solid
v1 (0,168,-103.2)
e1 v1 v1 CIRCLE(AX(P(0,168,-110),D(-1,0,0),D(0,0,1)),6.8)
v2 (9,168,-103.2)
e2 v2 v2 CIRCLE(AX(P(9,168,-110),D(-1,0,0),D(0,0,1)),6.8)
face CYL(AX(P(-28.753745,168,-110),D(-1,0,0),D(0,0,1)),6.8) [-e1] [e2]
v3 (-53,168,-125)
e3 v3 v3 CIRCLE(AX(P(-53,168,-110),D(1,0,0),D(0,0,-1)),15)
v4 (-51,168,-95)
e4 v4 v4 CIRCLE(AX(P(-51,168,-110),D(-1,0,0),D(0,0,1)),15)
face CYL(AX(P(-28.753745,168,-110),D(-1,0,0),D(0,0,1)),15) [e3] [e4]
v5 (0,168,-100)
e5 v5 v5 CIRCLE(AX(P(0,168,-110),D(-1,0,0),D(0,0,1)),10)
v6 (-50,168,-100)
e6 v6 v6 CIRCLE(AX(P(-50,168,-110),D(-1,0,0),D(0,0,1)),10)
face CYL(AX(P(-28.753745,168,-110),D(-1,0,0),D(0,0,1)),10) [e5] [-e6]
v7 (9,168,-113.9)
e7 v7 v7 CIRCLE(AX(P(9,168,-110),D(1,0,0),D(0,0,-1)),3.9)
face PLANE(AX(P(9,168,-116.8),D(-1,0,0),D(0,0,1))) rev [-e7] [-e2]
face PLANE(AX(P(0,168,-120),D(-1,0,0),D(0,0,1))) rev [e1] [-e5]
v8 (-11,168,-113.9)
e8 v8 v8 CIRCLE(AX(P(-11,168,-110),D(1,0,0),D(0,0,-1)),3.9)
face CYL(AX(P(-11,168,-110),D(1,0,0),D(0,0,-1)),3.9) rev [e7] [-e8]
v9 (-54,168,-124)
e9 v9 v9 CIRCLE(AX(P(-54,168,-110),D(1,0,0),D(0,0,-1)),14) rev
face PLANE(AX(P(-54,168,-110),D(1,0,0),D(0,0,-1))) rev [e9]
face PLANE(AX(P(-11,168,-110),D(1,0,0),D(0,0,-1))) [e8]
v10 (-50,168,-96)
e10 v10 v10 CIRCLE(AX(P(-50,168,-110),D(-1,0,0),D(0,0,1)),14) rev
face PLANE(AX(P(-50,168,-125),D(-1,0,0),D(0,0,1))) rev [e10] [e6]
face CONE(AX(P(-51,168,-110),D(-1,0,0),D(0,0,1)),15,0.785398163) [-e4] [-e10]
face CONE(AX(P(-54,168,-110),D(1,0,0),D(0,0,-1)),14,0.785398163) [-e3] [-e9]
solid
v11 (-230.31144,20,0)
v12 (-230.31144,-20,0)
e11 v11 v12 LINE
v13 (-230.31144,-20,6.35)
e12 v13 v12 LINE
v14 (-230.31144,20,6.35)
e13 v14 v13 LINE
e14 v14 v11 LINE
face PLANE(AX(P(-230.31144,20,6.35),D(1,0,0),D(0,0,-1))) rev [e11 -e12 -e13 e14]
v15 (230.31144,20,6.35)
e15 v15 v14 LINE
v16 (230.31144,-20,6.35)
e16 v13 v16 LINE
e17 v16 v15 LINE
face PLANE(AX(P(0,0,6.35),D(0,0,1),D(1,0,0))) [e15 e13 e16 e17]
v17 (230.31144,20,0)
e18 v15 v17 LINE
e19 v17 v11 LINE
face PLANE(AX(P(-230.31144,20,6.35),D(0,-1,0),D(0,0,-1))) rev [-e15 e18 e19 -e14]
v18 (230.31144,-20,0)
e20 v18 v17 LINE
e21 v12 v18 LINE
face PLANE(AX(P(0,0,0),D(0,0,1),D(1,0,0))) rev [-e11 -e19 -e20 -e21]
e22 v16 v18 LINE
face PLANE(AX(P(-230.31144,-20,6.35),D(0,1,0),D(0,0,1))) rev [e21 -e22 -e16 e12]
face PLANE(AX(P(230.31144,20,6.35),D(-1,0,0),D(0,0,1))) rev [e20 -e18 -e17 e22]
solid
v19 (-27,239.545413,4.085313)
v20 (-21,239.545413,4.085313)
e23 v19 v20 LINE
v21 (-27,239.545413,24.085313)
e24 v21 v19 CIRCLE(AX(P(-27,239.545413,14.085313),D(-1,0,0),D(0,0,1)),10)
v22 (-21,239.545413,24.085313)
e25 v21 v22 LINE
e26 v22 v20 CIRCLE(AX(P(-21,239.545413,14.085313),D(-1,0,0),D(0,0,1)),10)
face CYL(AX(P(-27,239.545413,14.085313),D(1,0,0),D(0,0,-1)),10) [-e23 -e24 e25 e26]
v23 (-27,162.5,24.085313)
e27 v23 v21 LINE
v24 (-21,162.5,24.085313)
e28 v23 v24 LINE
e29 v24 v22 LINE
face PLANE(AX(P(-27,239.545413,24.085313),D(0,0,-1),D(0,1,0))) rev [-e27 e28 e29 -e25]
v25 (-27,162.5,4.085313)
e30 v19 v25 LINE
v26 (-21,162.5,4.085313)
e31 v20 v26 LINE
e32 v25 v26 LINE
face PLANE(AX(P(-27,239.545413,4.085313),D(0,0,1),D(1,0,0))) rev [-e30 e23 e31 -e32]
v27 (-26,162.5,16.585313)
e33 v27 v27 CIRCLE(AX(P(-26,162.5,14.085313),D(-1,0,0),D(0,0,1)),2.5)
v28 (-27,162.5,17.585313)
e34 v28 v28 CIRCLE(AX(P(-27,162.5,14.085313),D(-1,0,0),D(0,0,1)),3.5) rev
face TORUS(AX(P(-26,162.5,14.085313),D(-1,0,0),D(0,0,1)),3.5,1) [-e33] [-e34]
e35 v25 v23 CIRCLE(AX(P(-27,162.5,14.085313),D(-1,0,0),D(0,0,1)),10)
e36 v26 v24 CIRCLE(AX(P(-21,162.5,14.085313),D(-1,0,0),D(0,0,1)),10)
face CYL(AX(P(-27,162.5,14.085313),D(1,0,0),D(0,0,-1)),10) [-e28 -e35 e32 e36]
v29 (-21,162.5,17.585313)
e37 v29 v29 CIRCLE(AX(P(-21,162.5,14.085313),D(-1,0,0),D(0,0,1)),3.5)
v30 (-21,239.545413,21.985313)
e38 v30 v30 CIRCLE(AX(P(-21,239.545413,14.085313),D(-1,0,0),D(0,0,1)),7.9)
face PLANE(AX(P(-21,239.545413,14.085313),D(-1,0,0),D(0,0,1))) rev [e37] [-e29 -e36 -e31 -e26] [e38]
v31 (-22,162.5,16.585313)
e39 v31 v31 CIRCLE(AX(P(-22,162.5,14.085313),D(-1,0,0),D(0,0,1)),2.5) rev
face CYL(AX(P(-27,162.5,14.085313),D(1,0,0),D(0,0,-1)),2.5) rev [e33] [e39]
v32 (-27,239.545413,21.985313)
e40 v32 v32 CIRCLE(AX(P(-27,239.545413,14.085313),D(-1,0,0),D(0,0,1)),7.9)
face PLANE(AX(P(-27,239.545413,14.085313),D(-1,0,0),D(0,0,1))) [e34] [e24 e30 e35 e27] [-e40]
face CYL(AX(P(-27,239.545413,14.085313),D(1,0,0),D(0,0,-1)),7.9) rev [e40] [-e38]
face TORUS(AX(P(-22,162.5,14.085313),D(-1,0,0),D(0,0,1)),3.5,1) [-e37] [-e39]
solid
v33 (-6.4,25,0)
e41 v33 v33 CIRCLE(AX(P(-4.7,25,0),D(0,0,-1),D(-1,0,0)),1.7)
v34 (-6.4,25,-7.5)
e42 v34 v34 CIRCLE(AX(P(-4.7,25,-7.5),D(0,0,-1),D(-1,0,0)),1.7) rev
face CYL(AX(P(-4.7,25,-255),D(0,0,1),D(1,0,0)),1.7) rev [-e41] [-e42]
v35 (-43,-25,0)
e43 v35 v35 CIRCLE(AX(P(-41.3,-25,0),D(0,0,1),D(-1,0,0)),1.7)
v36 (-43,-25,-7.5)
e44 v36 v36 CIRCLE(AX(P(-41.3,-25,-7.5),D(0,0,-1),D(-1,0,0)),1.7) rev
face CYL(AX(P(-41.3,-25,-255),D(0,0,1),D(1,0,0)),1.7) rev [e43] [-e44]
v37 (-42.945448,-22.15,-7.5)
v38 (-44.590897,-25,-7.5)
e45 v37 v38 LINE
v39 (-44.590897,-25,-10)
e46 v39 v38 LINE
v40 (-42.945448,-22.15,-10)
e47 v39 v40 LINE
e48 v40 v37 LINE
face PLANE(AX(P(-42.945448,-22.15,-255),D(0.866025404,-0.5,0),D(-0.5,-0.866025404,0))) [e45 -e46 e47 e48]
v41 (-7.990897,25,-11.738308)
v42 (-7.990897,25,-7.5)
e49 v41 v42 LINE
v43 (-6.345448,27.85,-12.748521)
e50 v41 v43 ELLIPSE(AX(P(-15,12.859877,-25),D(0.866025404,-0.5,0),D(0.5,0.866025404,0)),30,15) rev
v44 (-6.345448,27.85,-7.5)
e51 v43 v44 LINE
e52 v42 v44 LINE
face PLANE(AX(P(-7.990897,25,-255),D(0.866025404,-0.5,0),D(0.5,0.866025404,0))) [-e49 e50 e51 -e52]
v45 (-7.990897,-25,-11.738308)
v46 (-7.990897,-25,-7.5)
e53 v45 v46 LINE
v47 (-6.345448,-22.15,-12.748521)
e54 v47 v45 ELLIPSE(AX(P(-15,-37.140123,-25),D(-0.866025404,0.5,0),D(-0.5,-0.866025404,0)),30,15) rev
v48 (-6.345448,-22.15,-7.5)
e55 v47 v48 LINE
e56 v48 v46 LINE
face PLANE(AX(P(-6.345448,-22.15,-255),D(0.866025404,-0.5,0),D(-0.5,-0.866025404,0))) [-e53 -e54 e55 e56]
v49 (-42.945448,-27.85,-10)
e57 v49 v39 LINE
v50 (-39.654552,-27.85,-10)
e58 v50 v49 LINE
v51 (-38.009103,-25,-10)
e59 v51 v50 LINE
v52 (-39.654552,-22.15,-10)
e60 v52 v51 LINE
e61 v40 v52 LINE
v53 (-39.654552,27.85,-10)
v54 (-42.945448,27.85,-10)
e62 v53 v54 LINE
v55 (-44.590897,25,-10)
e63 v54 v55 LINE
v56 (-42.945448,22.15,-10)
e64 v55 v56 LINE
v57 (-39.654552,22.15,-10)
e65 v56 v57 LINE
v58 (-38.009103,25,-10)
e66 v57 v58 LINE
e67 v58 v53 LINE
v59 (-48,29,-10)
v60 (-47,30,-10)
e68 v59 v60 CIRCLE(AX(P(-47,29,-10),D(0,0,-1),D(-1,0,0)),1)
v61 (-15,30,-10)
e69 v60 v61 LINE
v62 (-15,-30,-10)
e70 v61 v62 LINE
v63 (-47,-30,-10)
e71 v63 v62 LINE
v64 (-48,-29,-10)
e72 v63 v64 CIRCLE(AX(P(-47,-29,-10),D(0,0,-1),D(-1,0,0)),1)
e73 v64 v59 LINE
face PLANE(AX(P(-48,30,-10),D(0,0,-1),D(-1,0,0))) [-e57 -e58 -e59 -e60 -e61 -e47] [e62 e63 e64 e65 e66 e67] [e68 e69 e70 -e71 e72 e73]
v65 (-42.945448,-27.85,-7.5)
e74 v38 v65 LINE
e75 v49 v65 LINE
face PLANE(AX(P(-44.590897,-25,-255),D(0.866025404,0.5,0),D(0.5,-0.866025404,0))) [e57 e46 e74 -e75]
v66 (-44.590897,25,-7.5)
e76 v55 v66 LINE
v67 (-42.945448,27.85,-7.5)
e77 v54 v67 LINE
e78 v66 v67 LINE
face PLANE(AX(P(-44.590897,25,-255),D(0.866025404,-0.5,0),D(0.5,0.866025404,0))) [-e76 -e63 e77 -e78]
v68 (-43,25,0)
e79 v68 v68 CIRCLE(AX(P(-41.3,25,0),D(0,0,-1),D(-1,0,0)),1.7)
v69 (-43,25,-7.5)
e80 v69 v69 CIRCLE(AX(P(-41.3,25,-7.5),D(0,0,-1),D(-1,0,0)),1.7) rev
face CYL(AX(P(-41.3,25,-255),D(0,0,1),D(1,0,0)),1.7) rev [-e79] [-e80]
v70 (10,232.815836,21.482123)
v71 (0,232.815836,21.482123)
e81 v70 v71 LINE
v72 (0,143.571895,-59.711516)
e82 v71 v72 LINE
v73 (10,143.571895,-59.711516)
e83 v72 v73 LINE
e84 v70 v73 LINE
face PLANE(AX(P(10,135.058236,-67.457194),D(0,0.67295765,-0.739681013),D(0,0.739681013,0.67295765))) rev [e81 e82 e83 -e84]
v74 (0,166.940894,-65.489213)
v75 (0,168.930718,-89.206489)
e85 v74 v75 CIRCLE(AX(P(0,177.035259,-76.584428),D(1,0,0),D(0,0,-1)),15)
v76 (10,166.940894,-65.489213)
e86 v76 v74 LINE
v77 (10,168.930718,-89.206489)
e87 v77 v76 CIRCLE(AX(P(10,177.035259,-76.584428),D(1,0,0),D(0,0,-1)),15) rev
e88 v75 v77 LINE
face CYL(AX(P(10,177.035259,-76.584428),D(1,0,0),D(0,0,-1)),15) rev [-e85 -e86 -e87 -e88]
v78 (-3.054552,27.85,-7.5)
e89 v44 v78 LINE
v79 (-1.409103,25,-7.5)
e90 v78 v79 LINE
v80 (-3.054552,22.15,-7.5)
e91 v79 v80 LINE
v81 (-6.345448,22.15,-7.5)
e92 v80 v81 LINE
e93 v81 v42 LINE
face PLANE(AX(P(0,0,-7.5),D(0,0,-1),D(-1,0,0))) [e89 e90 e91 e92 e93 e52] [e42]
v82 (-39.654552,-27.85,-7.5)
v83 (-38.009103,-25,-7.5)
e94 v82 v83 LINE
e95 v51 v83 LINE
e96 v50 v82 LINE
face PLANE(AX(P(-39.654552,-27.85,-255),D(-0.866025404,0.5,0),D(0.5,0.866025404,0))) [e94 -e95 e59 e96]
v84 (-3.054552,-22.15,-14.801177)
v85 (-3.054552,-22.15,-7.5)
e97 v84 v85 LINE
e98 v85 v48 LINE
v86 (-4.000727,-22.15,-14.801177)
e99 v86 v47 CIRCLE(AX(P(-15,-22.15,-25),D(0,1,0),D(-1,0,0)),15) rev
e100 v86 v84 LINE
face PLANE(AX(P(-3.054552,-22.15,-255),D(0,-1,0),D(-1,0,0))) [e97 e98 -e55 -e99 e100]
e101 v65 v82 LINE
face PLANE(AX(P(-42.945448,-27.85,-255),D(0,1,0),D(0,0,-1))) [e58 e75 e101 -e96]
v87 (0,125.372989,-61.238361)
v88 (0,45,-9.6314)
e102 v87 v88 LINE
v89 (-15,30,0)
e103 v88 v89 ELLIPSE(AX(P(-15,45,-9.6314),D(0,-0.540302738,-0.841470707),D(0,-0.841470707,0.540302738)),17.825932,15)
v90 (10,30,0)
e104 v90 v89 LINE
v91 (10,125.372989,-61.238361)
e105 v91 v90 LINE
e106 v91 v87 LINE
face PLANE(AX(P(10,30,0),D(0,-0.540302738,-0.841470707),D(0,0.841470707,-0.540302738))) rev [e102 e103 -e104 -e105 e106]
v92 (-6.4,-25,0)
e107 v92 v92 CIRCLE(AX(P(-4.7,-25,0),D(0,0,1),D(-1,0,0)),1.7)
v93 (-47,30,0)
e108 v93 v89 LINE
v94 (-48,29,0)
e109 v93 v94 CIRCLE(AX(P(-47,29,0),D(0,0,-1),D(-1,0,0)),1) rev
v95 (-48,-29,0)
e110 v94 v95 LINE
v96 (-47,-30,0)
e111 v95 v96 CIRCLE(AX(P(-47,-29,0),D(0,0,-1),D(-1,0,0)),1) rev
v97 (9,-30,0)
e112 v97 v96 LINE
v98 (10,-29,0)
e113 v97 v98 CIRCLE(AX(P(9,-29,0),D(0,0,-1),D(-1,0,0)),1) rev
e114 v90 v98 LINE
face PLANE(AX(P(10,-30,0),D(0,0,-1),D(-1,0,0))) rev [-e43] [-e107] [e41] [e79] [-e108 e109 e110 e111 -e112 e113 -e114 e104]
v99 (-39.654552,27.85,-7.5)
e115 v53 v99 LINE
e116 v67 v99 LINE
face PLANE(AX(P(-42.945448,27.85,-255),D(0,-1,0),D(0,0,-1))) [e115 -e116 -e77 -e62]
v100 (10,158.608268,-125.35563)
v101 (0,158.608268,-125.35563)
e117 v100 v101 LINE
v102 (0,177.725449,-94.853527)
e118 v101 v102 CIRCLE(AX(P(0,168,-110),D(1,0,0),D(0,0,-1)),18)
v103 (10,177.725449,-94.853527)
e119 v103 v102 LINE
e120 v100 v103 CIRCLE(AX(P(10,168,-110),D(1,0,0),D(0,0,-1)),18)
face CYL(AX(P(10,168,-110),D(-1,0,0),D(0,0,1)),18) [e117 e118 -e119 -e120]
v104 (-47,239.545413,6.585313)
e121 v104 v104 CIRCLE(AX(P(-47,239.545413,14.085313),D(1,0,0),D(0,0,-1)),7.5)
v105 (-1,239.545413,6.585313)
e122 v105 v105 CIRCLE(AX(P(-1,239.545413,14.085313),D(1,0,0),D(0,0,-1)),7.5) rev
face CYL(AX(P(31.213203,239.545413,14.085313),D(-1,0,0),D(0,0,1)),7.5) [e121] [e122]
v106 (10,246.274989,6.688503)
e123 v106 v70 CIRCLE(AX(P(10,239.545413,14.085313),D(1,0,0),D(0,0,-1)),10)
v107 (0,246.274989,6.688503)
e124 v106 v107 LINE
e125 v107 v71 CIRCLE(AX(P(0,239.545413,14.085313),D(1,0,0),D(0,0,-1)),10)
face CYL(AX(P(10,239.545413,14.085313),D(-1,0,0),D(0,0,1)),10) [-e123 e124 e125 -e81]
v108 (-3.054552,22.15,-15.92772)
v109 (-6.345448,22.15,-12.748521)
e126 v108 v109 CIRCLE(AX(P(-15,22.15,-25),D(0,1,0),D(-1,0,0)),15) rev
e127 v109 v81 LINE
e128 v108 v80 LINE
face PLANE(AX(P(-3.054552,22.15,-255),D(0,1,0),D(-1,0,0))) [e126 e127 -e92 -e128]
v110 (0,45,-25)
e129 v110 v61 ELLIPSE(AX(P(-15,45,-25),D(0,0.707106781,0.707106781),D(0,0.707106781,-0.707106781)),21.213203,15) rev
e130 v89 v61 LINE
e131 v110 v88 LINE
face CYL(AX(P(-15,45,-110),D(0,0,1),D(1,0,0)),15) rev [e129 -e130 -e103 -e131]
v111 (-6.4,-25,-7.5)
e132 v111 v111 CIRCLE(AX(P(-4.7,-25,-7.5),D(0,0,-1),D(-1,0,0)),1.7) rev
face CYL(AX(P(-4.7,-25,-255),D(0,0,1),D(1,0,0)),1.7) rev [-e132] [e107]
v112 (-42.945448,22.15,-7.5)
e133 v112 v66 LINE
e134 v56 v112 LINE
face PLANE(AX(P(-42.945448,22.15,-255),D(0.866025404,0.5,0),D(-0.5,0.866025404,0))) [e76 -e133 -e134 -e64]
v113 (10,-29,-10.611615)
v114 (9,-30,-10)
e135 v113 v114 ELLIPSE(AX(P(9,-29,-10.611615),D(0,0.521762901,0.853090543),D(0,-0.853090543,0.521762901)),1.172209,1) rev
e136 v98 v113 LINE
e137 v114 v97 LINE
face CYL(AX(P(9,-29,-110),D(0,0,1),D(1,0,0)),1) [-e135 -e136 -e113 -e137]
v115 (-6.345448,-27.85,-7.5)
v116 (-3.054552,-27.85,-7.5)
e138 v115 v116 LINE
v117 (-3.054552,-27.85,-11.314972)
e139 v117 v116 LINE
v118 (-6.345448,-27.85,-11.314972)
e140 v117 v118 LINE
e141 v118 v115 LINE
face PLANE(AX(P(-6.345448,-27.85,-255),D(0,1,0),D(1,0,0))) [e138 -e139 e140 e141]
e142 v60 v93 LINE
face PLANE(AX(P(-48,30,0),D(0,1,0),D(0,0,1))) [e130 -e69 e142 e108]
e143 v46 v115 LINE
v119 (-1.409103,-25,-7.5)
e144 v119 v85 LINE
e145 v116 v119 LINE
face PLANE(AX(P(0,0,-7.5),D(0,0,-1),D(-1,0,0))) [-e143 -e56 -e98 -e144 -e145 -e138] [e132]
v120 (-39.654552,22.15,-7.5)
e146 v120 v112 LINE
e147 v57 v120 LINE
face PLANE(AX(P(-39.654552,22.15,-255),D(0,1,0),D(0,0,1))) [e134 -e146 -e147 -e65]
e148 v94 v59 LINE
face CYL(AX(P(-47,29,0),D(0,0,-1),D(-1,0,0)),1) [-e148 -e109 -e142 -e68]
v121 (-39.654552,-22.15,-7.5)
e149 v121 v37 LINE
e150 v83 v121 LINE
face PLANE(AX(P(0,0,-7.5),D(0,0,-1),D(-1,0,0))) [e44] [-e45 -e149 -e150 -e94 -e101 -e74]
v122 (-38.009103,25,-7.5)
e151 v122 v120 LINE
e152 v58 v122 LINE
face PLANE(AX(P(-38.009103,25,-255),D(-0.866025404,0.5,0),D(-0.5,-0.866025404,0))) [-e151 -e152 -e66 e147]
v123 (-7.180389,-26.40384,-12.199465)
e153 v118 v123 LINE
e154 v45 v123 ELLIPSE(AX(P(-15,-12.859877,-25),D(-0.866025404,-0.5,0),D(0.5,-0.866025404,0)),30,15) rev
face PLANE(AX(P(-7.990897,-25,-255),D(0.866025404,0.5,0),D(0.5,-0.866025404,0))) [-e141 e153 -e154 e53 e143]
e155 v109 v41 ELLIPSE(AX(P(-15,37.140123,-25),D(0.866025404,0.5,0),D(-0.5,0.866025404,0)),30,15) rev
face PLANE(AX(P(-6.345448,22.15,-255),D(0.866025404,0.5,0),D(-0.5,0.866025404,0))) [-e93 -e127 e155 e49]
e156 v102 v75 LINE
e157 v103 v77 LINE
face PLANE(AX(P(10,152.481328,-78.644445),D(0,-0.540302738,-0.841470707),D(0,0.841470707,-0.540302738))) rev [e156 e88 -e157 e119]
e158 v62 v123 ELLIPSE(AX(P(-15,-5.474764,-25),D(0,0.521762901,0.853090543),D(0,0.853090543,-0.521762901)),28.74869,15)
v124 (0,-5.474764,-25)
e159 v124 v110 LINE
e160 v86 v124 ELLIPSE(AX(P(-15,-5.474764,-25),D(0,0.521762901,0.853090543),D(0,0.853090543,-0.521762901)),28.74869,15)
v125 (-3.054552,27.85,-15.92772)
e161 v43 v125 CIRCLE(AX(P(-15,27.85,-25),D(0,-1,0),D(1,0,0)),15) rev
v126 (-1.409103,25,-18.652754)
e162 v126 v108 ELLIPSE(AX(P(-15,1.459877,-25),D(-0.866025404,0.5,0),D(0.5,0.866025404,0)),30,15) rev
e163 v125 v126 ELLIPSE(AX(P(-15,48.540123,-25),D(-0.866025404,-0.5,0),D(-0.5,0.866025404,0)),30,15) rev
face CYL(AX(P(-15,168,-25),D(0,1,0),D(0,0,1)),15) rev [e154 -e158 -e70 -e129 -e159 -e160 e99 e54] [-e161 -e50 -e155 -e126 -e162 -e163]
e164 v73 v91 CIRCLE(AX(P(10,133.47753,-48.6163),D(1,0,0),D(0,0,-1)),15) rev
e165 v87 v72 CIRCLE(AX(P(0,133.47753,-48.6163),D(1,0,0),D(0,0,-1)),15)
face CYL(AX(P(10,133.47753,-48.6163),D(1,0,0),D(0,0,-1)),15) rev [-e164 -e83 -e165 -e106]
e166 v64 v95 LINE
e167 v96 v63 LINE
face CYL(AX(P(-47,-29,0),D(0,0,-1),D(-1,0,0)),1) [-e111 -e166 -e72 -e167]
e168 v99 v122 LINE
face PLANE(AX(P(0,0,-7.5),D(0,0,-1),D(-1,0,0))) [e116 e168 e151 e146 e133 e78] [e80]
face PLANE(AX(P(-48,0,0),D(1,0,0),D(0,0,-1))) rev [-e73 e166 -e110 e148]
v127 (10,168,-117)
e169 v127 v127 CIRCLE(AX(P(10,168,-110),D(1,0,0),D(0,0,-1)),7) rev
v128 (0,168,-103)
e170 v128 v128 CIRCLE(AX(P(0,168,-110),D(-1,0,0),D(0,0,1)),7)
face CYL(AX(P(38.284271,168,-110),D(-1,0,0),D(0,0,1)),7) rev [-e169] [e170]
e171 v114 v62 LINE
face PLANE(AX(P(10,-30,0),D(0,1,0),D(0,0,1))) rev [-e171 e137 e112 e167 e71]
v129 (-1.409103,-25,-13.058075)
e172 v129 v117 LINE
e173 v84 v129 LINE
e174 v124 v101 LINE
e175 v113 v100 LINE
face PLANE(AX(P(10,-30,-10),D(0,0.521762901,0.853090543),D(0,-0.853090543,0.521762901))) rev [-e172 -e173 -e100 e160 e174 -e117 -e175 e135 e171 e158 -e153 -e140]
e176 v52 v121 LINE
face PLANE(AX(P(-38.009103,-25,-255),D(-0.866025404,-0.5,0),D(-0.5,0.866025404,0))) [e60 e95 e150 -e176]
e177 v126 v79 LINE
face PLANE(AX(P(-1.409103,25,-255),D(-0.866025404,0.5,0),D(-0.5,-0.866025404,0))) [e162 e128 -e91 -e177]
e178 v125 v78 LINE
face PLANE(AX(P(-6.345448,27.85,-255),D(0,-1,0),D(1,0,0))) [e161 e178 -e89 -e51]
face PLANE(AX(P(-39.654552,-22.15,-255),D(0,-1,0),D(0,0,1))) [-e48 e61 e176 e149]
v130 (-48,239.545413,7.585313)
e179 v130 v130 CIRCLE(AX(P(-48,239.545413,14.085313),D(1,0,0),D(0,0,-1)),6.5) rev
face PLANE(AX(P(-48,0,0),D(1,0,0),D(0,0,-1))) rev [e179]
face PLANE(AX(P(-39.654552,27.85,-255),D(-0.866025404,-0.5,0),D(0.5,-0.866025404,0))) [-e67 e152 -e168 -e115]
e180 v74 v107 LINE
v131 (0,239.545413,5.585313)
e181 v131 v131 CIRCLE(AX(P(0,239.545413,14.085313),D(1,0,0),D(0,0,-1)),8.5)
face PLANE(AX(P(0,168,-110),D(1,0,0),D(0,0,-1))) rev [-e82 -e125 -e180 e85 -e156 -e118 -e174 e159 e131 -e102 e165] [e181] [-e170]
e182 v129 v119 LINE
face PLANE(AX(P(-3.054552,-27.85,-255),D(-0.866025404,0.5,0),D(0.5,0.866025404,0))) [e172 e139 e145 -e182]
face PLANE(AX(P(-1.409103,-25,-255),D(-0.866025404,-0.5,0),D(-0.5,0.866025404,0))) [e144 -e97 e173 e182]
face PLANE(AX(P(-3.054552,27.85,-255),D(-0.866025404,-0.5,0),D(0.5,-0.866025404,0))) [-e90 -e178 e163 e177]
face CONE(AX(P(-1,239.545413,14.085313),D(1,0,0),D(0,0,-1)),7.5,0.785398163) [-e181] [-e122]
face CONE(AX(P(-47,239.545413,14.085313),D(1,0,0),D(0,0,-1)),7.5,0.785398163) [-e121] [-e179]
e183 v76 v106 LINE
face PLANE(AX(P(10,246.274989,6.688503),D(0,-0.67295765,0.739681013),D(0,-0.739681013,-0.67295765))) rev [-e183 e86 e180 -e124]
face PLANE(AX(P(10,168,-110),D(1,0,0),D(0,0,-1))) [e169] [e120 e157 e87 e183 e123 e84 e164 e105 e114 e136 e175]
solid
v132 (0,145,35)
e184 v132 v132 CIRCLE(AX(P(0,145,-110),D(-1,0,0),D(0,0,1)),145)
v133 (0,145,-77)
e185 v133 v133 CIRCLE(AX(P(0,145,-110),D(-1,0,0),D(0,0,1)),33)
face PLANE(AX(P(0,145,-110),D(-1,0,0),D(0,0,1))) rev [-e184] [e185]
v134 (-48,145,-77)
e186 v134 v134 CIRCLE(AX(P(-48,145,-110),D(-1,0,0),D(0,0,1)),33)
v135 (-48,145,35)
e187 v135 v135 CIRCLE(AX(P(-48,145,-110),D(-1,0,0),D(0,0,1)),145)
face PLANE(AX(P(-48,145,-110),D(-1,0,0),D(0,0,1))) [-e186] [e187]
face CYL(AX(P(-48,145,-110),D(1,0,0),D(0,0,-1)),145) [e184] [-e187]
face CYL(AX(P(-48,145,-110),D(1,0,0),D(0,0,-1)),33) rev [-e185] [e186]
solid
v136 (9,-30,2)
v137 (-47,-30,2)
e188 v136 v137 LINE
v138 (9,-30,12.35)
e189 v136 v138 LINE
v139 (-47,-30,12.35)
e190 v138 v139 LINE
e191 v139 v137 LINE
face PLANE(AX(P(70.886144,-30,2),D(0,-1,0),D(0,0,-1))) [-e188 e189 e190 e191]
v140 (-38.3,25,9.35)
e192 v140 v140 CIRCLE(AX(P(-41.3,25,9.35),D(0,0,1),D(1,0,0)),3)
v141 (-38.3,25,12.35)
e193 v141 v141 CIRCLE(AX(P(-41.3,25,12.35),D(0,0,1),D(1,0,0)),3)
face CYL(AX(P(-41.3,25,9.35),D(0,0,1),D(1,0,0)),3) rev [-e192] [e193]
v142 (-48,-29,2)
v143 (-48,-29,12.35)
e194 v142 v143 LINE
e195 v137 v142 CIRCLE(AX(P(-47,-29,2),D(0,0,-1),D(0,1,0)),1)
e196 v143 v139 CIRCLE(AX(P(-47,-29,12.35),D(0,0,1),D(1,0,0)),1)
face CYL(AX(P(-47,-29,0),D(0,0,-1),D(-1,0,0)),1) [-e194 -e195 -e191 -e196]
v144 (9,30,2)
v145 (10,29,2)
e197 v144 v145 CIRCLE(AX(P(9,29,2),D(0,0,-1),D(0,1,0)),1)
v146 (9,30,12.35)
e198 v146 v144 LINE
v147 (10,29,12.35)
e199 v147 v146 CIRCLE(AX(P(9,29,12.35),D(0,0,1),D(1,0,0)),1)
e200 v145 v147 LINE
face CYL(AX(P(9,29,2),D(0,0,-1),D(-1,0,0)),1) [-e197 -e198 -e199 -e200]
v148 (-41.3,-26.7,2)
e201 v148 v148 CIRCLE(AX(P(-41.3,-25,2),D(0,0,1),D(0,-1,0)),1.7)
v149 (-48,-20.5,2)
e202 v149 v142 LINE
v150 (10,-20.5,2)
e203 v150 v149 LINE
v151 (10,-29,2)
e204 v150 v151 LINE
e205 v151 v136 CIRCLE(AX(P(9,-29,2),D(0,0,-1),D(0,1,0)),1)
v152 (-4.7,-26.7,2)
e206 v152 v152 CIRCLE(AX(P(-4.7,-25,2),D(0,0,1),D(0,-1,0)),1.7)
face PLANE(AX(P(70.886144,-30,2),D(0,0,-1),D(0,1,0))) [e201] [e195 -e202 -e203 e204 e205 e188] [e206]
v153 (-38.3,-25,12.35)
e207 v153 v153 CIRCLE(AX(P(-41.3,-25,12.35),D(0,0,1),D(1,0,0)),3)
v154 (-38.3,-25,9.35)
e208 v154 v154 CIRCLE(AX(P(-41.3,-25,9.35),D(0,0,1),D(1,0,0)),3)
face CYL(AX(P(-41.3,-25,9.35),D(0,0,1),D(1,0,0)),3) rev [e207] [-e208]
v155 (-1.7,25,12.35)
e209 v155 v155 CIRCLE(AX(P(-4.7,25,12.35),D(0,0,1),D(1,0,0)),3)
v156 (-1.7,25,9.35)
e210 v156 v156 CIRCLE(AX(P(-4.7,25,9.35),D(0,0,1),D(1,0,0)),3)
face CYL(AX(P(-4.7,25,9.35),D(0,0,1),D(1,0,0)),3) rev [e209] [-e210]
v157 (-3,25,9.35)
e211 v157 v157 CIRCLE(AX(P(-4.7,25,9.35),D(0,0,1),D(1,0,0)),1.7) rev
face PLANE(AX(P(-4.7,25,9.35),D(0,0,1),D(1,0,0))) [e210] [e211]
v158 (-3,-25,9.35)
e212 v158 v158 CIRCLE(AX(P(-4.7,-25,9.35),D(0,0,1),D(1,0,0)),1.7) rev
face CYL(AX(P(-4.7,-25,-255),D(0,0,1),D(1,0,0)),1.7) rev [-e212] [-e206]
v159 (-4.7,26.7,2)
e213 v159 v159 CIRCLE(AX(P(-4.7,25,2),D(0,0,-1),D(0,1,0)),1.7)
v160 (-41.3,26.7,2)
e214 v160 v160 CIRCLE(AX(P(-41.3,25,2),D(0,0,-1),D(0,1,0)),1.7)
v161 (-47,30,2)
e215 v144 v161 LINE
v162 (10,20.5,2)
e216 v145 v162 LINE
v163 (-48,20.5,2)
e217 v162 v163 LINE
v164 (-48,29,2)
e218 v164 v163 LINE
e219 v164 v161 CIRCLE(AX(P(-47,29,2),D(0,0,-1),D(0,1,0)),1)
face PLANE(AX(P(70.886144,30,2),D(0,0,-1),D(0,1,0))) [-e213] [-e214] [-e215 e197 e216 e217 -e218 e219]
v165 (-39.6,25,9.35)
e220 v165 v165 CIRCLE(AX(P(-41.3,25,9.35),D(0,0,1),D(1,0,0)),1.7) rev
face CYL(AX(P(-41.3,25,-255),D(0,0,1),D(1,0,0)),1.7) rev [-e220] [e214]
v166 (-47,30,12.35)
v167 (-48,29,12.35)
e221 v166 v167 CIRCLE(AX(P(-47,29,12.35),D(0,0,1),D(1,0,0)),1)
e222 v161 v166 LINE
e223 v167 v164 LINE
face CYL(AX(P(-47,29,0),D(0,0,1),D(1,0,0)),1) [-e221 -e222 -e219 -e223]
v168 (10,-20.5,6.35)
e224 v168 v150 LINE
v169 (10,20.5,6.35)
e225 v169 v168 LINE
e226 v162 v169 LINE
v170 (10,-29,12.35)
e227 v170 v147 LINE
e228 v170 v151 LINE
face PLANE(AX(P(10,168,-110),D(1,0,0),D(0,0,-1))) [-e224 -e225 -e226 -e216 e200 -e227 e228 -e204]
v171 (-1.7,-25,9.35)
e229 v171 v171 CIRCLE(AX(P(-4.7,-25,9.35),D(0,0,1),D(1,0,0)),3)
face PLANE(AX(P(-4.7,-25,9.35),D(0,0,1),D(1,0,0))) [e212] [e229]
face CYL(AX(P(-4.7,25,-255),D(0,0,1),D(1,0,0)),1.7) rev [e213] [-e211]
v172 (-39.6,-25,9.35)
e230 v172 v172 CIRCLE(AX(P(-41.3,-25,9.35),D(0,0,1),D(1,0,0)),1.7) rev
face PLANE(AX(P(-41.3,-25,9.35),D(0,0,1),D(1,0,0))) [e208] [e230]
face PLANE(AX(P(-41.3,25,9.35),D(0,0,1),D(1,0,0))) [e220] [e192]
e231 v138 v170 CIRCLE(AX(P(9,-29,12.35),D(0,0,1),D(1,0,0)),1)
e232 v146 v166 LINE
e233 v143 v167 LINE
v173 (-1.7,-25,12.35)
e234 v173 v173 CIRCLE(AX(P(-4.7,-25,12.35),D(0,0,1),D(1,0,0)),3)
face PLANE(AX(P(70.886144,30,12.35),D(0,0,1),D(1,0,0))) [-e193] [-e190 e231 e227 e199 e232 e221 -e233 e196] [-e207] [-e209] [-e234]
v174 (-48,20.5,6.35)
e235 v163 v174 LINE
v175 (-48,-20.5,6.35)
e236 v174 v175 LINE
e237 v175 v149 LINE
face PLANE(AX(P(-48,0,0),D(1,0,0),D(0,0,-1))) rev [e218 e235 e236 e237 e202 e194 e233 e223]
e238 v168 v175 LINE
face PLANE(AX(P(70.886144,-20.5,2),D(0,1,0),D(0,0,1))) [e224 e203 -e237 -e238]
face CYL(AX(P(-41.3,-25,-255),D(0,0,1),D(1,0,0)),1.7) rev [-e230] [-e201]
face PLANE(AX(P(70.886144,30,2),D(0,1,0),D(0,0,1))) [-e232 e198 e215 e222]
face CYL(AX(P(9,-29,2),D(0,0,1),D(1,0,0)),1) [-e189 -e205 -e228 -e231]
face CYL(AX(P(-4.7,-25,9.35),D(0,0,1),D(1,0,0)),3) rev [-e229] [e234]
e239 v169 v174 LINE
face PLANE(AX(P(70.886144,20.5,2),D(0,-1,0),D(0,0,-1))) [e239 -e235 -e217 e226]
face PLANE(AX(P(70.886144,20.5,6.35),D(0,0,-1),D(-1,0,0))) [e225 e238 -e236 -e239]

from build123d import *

# Parameters (mm, degrees)
SKETCH1_W                 = 460.622879588
SKETCH1_H                 = 40
BOSS_EXTRUDE1_DEPTH       = 6.35
SKETCH2_R                 = 10
SKETCH2_R_2               = 7.5
BOSS_EXTRUDE2_DEPTH       = 10
BOSS_EXTRUDE8_START       = -48
SKETCH2_2_R               = 7.5
BOSS_EXTRUDE8_DEPTH       = 58
SKETCH3_W                 = 10
SKETCH3_H                 = 60
BOSS_EXTRUDE3_DEPTH       = 48
SKETCH6_R                 = 145
SKETCH6_R_2               = 33
BOSS_EXTRUDE5_DEPTH       = 48
BOSS_EXTRUDE6_DEPTH       = 58
SKETCH8_R                 = 1.7
CUT_EXTRUDE2_DEPTH        = 457.748707497
FILLET1_R                 = 15
CUT_EXTRUDE3_START        = -2.5
CUT_EXTRUDE3_DEPTH        = 447.536439158
SKETCH10_R                = 3
CUT_EXTRUDE4_DEPTH        = 3
FILLET2_R                 = 15
FILLET4_R                 = 1
FILLET5_R                 = 1
BOSS_EXTRUDE7_START       = -10
BOSS_EXTRUDE7_OUTLINE_R   = 10
BOSS_EXTRUDE7_OUTLINE_R_2 = 7
BOSS_EXTRUDE7_DEPTH       = 10
CHAMFER1_SIZE             = 1
SKETCH13_R                = 3.9
CUT_EXTRUDE5_DEPTH        = 20
SKETCH14_R                = 7.9
SKETCH14_R_2              = 2.5
BOSS_EXTRUDE9_DEPTH       = 3
FILLET6_R                 = 1
CHAMFER2_SIZE             = 1
CHAMFER3_SIZE             = 1


# Read off the part's stored shape, not the designer's step: Boss-Extrude7
with BuildPart() as part:
    # Sketch1 → Boss-Extrude1 (new body)
    with BuildSketch(Plane.XY):
        Rectangle(SKETCH1_W, SKETCH1_H)
    extrude(amount=BOSS_EXTRUDE1_DEPTH)


with BuildPart() as body_2:
    # Sketch2 → Boss-Extrude2 (new body)
    with BuildSketch(Plane(origin=(0, 0, 0), x_dir=(0, 0, -1), z_dir=(1, 0, 0))):
        with BuildLine():
            Line((0, -30), (0, 30))
            Line((0, 30), (67.457194038, 135.058236459))
            Line((67.457194038, 135.058236459), (-21.482123399, 232.815836042))
            ThreePointArc((-21.482123399, 232.815836042), (-20.814889761, 246.942222673), (-6.68850313, 246.274989036))
            Line((-6.68850313, 246.274989036), (78.644445131, 152.481328057))
            Line((78.644445131, 152.481328057), (94.853527266, 177.725449281))
            ThreePointArc((94.853527266, 177.725449281), (119.559162816, 183.251964013), (125.355629783, 158.608267786))
            Line((125.355629783, 158.608267786), (10, -30))
            Line((10, -30), (0, -30))
        make_face()
        with Locations((110, 168)):
            Circle(SKETCH2_R, mode=Mode.SUBTRACT)
        with Locations((-14.085313264, 239.545412539)):
            Circle(SKETCH2_R_2, mode=Mode.SUBTRACT)
    extrude(amount=BOSS_EXTRUDE2_DEPTH)

    # Sketch2<2> → Boss-Extrude8 (add)
    with BuildSketch(Plane(origin=(0, 0, 0), x_dir=(0, 0, -1), z_dir=(1, 0, 0)).offset(BOSS_EXTRUDE8_START)):
        with Locations((-14.085313264, 239.545412539)):
            Circle(SKETCH2_2_R)
    extrude(amount=BOSS_EXTRUDE8_DEPTH)

    # Sketch3 → Boss-Extrude3 (add)
    with BuildSketch(Plane(origin=(0, 0, 0), x_dir=(0, 0, -1), z_dir=(1, 0, 0))):
        with Locations((5, 0)):
            Rectangle(SKETCH3_W, SKETCH3_H)
    extrude(amount=-BOSS_EXTRUDE3_DEPTH)


with BuildPart() as body_3:
    # Sketch6 → Boss-Extrude5 (new body)
    with BuildSketch(Plane.ZY):
        with Locations((-110, 145)):
            Circle(SKETCH6_R)
        with Locations((-110, 145)):
            Circle(SKETCH6_R_2, mode=Mode.SUBTRACT)
    extrude(amount=BOSS_EXTRUDE5_DEPTH)


with BuildPart() as body_4:
    # Sketch7 → Boss-Extrude6 (new body)
    with BuildSketch(Plane.ZY.offset(48)):
        Polygon((2, 30), (2, 20.5), (6.35, 20.5), (6.35, -20.5), (2, -20.5), (2, -30), (12.35, -30), (12.35, 30), align=None)
    extrude(amount=-BOSS_EXTRUDE6_DEPTH)


with BuildPart() as cut_extrude2_tool:
    # Sketch8 → Cut-Extrude2 (new, through all)
    with BuildSketch(Plane.XY.offset(12.35)):
        with Locations((-41.3, 25)):
            Circle(SKETCH8_R)
        with Locations((-4.7, 25)):
            Circle(SKETCH8_R)
    cut_extrude2 = extrude(amount=-CUT_EXTRUDE2_DEPTH)


with BuildPart() as body_2_1:
    add(body_2.part)

    # Cut-Extrude2: cut by cut_extrude2_tool
    add(cut_extrude2_tool.part, mode=Mode.SUBTRACT)

    # Fillet1
    # the kernel refuses this fillet: 15 mm, written as the material it adds along each edge
    with BuildSketch(Plane(origin=(0, 30, -10), x_dir=(0, 0, -1), z_dir=(0, -1, 0))) as fillet1_piece_1_section:
        with BuildLine():
            CenterArc((FILLET1_R, -FILLET1_R), FILLET1_R, 90, 90)
            Line((0, -FILLET1_R), (0, 0))
            Line((0, 0), (FILLET1_R, 0))
        make_face()
    fillet1_piece_1 = extrude(amount=60, mode=Mode.PRIVATE)
    fillet1_piece_1 = split(fillet1_piece_1, bisect_by=Plane(origin=(-3.567406216, -5.161085069, -25.191850859), z_dir=(0, 0.5217629007539379, 0.8530905434927976)), keep=Keep.TOP, mode=Mode.PRIVATE)
    fillet1_piece_1 = fillet1_piece_1 - Plane(origin=(-4.7, 25, -13.097259415), x_dir=(1, 0, 0), z_dir=(0, 0, 1)) * Cylinder(1.7, 180, mode=Mode.PRIVATE)
    add(fillet1_piece_1)
    with BuildSketch(Plane(origin=(0, 30, 0), x_dir=(0, 1, 0), z_dir=(0, 0, -1))) as fillet1_piece_2_section:
        with BuildLine():
            CenterArc((FILLET1_R, -FILLET1_R), FILLET1_R, 90, 90)
            Line((0, -FILLET1_R), (0, 0))
            Line((0, 0), (FILLET1_R, 0))
        make_face()
    fillet1_piece_2 = extrude(amount=10, mode=Mode.PRIVATE)
    fillet1_piece_2 = split(fillet1_piece_2, bisect_by=Plane(origin=(-3.899810015, 34.444685131, -2.853902725), z_dir=(0, -0.5403027378240759, -0.841470707452023)), keep=Keep.TOP, mode=Mode.PRIVATE)
    add(fillet1_piece_2)
    with BuildSketch(Plane(origin=(0, 30, 0), x_dir=(0, 1, 0), z_dir=(0, 0, -1))) as fillet1_piece_3a_section:
        with BuildLine():
            CenterArc((FILLET1_R, -FILLET1_R), FILLET1_R, 90, 90)
            Line((0, -FILLET1_R), (0, 0))
            Line((0, 0), (FILLET1_R, 0))
        make_face()
    fillet1_piece_3a = extrude(amount=47.5, mode=Mode.PRIVATE)
    fillet1_piece_3a = split(fillet1_piece_3a, bisect_by=Plane(origin=(-3.381337536, 24.454564435, -43.305223831), z_dir=(0, 0.5217629007539379, 0.8530905434927976)), keep=Keep.TOP, mode=Mode.PRIVATE)
    fillet1_piece_3a = split(fillet1_piece_3a, bisect_by=Plane(origin=(-3.381337536, 33.411569793, -10), z_dir=(0, 0, -1)), keep=Keep.TOP, mode=Mode.PRIVATE)
    with BuildSketch(Plane(origin=(0, 67.5, -10), x_dir=(0, 0, -1), z_dir=(0, -1, 0))) as fillet1_piece_3b_section:
        with BuildLine():
            CenterArc((FILLET1_R, -FILLET1_R), FILLET1_R, 90, 90)
            Line((0, -FILLET1_R), (0, 0))
            Line((0, 0), (FILLET1_R, 0))
        make_face()
    fillet1_piece_3b = extrude(amount=97.5, mode=Mode.PRIVATE)
    fillet1_piece_3b = split(fillet1_piece_3b, bisect_by=Plane(origin=(-2.935278618, 44.257987997, -9.154959148), z_dir=(0, -0.5403027378240759, -0.841470707452023)), keep=Keep.TOP, mode=Mode.PRIVATE)
    fillet1_piece_3b = split(fillet1_piece_3b, bisect_by=Plane(origin=(-2.935278618, 30, -14.174785424), z_dir=(0, 1, 0)), keep=Keep.TOP, mode=Mode.PRIVATE)
    fillet1_piece_3 = fillet1_piece_3a & fillet1_piece_3b
    add(fillet1_piece_3)

    # Sketch9 → Cut-Extrude3 (cut)
    with BuildSketch(Plane(origin=(0, 0, -10), x_dir=(-1, 0, 0), z_dir=(0, 0, -1)).offset(CUT_EXTRUDE3_START)):
        Polygon((3.054551733, 22.15), (6.345448267, 22.15), (7.990896534, 25), (6.345448267, 27.85), (3.054551733, 27.85), (1.409103466, 25), align=None)
        Polygon((39.654551733, 22.15), (42.945448267, 22.15), (44.590896534, 25), (42.945448267, 27.85), (39.654551733, 27.85), (38.009103466, 25), align=None)
    cut_extrude3 = extrude(amount=CUT_EXTRUDE3_DEPTH, mode=Mode.SUBTRACT)


with BuildPart() as body_4_1:
    add(body_4.part)

    # Cut-Extrude2: cut by cut_extrude2_tool
    add(cut_extrude2_tool.part, mode=Mode.SUBTRACT)


with BuildPart() as mirror1_tool:
    # Mirror1: Cut-Extrude2, Cut-Extrude3 across plane
    add(cut_extrude2.mirror(Plane.ZX))
    add(cut_extrude3.mirror(Plane.ZX))


with BuildPart() as body_2_2:
    add(body_2_1.part)

    # Mirror1: cut by mirror1_tool
    add(mirror1_tool.part, mode=Mode.SUBTRACT)

    # Fillet2
    fillet2_edges = [body_2_2.edges().sort_by_distance(p)[0] for p in [
        (5, 135.058236459, -67.457194038),
        (5, 152.481328057, -78.644445131),
    ]]
    fillet(fillet2_edges, radius=FILLET2_R)

    # Fillet4
    fillet4_edges = [body_2_2.edges().sort_by_distance(p)[0] for p in [
        (-48, 30, -5),
        (-48, -30, -5),
        (10, -30, -5),
    ]]
    fillet(fillet4_edges, radius=FILLET4_R)

    # Boss-Extrude7 outline → Boss-Extrude7 (add)
    with BuildSketch(Plane.ZY.offset(BOSS_EXTRUDE7_START)):
        with Locations((-110, 168)):
            Circle(BOSS_EXTRUDE7_OUTLINE_R)
        with Locations((-110, 168)):
            Circle(BOSS_EXTRUDE7_OUTLINE_R_2, mode=Mode.SUBTRACT)
    extrude(amount=BOSS_EXTRUDE7_DEPTH)

    # Chamfer2
    chamfer2_edges = [body_2_2.edges().sort_by_distance(p)[0] for p in [
        (-48, 239.545412539, 21.585313264),
    ]]
    chamfer(chamfer2_edges, length=CHAMFER2_SIZE)

    # Chamfer3
    chamfer3_edges = [body_2_2.edges().sort_by_distance(p)[0] for p in [
        (0, 239.545412539, 21.585313264),
    ]]
    chamfer(chamfer3_edges, length=CHAMFER3_SIZE)


with BuildPart() as body_4_2:
    add(body_4_1.part)

    # Mirror1: cut by mirror1_tool
    add(mirror1_tool.part, mode=Mode.SUBTRACT)

    # Sketch10 → Cut-Extrude4 (cut)
    with BuildSketch(Plane.XY.offset(12.35)):
        with Locations((-41.3, 25)):
            Circle(SKETCH10_R)
        with Locations((-4.7, 25)):
            Circle(SKETCH10_R)
        with Locations((-4.7, -25)):
            Circle(SKETCH10_R)
        with Locations((-41.3, -25)):
            Circle(SKETCH10_R)
    extrude(amount=-CUT_EXTRUDE4_DEPTH, mode=Mode.SUBTRACT)

    # Fillet5
    fillet5_edges = [body_4_2.edges().sort_by_distance(p)[0] for p in [
        (-48, -30, 7.175),
        (10, -30, 7.175),
        (10, 30, 7.175),
        (-48, 30, 7.175),
    ]]
    fillet(fillet5_edges, radius=FILLET5_R)


with BuildPart() as body_5:
    # Sketch12 → Revolve1 (revolve)
    with BuildSketch(Plane(origin=(0, 168, 0), x_dir=(1, 0, 0), z_dir=(0, 1, 0)), mode=Mode.PRIVATE) as revolve1_sk:
        Polygon((0, 120), (0, 116.8), (9, 116.8), (9, 110), (-54, 110), (-54, 125), (-50, 125), (-50, 120), align=None)
    revolve(revolve1_sk.sketch.rotate(Axis((-28.753745024, 168, -110), (1, 0, 0)), 180), axis=Axis((-28.753745024, 168, -110), (1, 0, 0)))

    # Chamfer1
    chamfer1_edges = [body_5.edges().sort_by_distance(p)[0] for p in [
        (-50, 168, -125),
        (-54, 168, -125),
    ]]
    chamfer(chamfer1_edges, length=CHAMFER1_SIZE)

    # Sketch13 → Cut-Extrude5 (cut)
    with BuildSketch(Plane(origin=(9, 0, 0), x_dir=(0, 0, -1), z_dir=(1, 0, 0))):
        with Locations((110, 168)):
            Circle(SKETCH13_R)
    extrude(amount=-CUT_EXTRUDE5_DEPTH, mode=Mode.SUBTRACT)


with BuildPart() as body_6:
    # Sketch14 → Boss-Extrude9 (new, symmetric)
    with BuildSketch(Plane.ZY.offset(24)):
        with BuildLine():
            Line((4.085313264, 239.545412539), (4.085313264, 162.5))
            ThreePointArc((4.085313264, 162.5), (14.085313264, 152.5), (24.085313264, 162.5))
            Line((24.085313264, 162.5), (24.085313264, 239.545412539))
            ThreePointArc((24.085313264, 239.545412539), (14.085313264, 249.545412539), (4.085313264, 239.545412539))
        make_face()
        with Locations((14.085313264, 239.545412539)):
            Circle(SKETCH14_R, mode=Mode.SUBTRACT)
        with Locations((14.085313264, 162.5)):
            Circle(SKETCH14_R_2, mode=Mode.SUBTRACT)
    extrude(amount=BOSS_EXTRUDE9_DEPTH, both=True)

    # Fillet6
    fillet6_edges = [body_6.edges().sort_by_distance(p)[0] for p in [
        (-21, 162.5, 11.585313264),
        (-27, 162.5, 11.585313264),
    ]]
    fillet(fillet6_edges, radius=FILLET6_R)


solid = Compound([part.part, body_3.part, body_2_2.part, body_4_2.part, body_5.part, body_6.part])
